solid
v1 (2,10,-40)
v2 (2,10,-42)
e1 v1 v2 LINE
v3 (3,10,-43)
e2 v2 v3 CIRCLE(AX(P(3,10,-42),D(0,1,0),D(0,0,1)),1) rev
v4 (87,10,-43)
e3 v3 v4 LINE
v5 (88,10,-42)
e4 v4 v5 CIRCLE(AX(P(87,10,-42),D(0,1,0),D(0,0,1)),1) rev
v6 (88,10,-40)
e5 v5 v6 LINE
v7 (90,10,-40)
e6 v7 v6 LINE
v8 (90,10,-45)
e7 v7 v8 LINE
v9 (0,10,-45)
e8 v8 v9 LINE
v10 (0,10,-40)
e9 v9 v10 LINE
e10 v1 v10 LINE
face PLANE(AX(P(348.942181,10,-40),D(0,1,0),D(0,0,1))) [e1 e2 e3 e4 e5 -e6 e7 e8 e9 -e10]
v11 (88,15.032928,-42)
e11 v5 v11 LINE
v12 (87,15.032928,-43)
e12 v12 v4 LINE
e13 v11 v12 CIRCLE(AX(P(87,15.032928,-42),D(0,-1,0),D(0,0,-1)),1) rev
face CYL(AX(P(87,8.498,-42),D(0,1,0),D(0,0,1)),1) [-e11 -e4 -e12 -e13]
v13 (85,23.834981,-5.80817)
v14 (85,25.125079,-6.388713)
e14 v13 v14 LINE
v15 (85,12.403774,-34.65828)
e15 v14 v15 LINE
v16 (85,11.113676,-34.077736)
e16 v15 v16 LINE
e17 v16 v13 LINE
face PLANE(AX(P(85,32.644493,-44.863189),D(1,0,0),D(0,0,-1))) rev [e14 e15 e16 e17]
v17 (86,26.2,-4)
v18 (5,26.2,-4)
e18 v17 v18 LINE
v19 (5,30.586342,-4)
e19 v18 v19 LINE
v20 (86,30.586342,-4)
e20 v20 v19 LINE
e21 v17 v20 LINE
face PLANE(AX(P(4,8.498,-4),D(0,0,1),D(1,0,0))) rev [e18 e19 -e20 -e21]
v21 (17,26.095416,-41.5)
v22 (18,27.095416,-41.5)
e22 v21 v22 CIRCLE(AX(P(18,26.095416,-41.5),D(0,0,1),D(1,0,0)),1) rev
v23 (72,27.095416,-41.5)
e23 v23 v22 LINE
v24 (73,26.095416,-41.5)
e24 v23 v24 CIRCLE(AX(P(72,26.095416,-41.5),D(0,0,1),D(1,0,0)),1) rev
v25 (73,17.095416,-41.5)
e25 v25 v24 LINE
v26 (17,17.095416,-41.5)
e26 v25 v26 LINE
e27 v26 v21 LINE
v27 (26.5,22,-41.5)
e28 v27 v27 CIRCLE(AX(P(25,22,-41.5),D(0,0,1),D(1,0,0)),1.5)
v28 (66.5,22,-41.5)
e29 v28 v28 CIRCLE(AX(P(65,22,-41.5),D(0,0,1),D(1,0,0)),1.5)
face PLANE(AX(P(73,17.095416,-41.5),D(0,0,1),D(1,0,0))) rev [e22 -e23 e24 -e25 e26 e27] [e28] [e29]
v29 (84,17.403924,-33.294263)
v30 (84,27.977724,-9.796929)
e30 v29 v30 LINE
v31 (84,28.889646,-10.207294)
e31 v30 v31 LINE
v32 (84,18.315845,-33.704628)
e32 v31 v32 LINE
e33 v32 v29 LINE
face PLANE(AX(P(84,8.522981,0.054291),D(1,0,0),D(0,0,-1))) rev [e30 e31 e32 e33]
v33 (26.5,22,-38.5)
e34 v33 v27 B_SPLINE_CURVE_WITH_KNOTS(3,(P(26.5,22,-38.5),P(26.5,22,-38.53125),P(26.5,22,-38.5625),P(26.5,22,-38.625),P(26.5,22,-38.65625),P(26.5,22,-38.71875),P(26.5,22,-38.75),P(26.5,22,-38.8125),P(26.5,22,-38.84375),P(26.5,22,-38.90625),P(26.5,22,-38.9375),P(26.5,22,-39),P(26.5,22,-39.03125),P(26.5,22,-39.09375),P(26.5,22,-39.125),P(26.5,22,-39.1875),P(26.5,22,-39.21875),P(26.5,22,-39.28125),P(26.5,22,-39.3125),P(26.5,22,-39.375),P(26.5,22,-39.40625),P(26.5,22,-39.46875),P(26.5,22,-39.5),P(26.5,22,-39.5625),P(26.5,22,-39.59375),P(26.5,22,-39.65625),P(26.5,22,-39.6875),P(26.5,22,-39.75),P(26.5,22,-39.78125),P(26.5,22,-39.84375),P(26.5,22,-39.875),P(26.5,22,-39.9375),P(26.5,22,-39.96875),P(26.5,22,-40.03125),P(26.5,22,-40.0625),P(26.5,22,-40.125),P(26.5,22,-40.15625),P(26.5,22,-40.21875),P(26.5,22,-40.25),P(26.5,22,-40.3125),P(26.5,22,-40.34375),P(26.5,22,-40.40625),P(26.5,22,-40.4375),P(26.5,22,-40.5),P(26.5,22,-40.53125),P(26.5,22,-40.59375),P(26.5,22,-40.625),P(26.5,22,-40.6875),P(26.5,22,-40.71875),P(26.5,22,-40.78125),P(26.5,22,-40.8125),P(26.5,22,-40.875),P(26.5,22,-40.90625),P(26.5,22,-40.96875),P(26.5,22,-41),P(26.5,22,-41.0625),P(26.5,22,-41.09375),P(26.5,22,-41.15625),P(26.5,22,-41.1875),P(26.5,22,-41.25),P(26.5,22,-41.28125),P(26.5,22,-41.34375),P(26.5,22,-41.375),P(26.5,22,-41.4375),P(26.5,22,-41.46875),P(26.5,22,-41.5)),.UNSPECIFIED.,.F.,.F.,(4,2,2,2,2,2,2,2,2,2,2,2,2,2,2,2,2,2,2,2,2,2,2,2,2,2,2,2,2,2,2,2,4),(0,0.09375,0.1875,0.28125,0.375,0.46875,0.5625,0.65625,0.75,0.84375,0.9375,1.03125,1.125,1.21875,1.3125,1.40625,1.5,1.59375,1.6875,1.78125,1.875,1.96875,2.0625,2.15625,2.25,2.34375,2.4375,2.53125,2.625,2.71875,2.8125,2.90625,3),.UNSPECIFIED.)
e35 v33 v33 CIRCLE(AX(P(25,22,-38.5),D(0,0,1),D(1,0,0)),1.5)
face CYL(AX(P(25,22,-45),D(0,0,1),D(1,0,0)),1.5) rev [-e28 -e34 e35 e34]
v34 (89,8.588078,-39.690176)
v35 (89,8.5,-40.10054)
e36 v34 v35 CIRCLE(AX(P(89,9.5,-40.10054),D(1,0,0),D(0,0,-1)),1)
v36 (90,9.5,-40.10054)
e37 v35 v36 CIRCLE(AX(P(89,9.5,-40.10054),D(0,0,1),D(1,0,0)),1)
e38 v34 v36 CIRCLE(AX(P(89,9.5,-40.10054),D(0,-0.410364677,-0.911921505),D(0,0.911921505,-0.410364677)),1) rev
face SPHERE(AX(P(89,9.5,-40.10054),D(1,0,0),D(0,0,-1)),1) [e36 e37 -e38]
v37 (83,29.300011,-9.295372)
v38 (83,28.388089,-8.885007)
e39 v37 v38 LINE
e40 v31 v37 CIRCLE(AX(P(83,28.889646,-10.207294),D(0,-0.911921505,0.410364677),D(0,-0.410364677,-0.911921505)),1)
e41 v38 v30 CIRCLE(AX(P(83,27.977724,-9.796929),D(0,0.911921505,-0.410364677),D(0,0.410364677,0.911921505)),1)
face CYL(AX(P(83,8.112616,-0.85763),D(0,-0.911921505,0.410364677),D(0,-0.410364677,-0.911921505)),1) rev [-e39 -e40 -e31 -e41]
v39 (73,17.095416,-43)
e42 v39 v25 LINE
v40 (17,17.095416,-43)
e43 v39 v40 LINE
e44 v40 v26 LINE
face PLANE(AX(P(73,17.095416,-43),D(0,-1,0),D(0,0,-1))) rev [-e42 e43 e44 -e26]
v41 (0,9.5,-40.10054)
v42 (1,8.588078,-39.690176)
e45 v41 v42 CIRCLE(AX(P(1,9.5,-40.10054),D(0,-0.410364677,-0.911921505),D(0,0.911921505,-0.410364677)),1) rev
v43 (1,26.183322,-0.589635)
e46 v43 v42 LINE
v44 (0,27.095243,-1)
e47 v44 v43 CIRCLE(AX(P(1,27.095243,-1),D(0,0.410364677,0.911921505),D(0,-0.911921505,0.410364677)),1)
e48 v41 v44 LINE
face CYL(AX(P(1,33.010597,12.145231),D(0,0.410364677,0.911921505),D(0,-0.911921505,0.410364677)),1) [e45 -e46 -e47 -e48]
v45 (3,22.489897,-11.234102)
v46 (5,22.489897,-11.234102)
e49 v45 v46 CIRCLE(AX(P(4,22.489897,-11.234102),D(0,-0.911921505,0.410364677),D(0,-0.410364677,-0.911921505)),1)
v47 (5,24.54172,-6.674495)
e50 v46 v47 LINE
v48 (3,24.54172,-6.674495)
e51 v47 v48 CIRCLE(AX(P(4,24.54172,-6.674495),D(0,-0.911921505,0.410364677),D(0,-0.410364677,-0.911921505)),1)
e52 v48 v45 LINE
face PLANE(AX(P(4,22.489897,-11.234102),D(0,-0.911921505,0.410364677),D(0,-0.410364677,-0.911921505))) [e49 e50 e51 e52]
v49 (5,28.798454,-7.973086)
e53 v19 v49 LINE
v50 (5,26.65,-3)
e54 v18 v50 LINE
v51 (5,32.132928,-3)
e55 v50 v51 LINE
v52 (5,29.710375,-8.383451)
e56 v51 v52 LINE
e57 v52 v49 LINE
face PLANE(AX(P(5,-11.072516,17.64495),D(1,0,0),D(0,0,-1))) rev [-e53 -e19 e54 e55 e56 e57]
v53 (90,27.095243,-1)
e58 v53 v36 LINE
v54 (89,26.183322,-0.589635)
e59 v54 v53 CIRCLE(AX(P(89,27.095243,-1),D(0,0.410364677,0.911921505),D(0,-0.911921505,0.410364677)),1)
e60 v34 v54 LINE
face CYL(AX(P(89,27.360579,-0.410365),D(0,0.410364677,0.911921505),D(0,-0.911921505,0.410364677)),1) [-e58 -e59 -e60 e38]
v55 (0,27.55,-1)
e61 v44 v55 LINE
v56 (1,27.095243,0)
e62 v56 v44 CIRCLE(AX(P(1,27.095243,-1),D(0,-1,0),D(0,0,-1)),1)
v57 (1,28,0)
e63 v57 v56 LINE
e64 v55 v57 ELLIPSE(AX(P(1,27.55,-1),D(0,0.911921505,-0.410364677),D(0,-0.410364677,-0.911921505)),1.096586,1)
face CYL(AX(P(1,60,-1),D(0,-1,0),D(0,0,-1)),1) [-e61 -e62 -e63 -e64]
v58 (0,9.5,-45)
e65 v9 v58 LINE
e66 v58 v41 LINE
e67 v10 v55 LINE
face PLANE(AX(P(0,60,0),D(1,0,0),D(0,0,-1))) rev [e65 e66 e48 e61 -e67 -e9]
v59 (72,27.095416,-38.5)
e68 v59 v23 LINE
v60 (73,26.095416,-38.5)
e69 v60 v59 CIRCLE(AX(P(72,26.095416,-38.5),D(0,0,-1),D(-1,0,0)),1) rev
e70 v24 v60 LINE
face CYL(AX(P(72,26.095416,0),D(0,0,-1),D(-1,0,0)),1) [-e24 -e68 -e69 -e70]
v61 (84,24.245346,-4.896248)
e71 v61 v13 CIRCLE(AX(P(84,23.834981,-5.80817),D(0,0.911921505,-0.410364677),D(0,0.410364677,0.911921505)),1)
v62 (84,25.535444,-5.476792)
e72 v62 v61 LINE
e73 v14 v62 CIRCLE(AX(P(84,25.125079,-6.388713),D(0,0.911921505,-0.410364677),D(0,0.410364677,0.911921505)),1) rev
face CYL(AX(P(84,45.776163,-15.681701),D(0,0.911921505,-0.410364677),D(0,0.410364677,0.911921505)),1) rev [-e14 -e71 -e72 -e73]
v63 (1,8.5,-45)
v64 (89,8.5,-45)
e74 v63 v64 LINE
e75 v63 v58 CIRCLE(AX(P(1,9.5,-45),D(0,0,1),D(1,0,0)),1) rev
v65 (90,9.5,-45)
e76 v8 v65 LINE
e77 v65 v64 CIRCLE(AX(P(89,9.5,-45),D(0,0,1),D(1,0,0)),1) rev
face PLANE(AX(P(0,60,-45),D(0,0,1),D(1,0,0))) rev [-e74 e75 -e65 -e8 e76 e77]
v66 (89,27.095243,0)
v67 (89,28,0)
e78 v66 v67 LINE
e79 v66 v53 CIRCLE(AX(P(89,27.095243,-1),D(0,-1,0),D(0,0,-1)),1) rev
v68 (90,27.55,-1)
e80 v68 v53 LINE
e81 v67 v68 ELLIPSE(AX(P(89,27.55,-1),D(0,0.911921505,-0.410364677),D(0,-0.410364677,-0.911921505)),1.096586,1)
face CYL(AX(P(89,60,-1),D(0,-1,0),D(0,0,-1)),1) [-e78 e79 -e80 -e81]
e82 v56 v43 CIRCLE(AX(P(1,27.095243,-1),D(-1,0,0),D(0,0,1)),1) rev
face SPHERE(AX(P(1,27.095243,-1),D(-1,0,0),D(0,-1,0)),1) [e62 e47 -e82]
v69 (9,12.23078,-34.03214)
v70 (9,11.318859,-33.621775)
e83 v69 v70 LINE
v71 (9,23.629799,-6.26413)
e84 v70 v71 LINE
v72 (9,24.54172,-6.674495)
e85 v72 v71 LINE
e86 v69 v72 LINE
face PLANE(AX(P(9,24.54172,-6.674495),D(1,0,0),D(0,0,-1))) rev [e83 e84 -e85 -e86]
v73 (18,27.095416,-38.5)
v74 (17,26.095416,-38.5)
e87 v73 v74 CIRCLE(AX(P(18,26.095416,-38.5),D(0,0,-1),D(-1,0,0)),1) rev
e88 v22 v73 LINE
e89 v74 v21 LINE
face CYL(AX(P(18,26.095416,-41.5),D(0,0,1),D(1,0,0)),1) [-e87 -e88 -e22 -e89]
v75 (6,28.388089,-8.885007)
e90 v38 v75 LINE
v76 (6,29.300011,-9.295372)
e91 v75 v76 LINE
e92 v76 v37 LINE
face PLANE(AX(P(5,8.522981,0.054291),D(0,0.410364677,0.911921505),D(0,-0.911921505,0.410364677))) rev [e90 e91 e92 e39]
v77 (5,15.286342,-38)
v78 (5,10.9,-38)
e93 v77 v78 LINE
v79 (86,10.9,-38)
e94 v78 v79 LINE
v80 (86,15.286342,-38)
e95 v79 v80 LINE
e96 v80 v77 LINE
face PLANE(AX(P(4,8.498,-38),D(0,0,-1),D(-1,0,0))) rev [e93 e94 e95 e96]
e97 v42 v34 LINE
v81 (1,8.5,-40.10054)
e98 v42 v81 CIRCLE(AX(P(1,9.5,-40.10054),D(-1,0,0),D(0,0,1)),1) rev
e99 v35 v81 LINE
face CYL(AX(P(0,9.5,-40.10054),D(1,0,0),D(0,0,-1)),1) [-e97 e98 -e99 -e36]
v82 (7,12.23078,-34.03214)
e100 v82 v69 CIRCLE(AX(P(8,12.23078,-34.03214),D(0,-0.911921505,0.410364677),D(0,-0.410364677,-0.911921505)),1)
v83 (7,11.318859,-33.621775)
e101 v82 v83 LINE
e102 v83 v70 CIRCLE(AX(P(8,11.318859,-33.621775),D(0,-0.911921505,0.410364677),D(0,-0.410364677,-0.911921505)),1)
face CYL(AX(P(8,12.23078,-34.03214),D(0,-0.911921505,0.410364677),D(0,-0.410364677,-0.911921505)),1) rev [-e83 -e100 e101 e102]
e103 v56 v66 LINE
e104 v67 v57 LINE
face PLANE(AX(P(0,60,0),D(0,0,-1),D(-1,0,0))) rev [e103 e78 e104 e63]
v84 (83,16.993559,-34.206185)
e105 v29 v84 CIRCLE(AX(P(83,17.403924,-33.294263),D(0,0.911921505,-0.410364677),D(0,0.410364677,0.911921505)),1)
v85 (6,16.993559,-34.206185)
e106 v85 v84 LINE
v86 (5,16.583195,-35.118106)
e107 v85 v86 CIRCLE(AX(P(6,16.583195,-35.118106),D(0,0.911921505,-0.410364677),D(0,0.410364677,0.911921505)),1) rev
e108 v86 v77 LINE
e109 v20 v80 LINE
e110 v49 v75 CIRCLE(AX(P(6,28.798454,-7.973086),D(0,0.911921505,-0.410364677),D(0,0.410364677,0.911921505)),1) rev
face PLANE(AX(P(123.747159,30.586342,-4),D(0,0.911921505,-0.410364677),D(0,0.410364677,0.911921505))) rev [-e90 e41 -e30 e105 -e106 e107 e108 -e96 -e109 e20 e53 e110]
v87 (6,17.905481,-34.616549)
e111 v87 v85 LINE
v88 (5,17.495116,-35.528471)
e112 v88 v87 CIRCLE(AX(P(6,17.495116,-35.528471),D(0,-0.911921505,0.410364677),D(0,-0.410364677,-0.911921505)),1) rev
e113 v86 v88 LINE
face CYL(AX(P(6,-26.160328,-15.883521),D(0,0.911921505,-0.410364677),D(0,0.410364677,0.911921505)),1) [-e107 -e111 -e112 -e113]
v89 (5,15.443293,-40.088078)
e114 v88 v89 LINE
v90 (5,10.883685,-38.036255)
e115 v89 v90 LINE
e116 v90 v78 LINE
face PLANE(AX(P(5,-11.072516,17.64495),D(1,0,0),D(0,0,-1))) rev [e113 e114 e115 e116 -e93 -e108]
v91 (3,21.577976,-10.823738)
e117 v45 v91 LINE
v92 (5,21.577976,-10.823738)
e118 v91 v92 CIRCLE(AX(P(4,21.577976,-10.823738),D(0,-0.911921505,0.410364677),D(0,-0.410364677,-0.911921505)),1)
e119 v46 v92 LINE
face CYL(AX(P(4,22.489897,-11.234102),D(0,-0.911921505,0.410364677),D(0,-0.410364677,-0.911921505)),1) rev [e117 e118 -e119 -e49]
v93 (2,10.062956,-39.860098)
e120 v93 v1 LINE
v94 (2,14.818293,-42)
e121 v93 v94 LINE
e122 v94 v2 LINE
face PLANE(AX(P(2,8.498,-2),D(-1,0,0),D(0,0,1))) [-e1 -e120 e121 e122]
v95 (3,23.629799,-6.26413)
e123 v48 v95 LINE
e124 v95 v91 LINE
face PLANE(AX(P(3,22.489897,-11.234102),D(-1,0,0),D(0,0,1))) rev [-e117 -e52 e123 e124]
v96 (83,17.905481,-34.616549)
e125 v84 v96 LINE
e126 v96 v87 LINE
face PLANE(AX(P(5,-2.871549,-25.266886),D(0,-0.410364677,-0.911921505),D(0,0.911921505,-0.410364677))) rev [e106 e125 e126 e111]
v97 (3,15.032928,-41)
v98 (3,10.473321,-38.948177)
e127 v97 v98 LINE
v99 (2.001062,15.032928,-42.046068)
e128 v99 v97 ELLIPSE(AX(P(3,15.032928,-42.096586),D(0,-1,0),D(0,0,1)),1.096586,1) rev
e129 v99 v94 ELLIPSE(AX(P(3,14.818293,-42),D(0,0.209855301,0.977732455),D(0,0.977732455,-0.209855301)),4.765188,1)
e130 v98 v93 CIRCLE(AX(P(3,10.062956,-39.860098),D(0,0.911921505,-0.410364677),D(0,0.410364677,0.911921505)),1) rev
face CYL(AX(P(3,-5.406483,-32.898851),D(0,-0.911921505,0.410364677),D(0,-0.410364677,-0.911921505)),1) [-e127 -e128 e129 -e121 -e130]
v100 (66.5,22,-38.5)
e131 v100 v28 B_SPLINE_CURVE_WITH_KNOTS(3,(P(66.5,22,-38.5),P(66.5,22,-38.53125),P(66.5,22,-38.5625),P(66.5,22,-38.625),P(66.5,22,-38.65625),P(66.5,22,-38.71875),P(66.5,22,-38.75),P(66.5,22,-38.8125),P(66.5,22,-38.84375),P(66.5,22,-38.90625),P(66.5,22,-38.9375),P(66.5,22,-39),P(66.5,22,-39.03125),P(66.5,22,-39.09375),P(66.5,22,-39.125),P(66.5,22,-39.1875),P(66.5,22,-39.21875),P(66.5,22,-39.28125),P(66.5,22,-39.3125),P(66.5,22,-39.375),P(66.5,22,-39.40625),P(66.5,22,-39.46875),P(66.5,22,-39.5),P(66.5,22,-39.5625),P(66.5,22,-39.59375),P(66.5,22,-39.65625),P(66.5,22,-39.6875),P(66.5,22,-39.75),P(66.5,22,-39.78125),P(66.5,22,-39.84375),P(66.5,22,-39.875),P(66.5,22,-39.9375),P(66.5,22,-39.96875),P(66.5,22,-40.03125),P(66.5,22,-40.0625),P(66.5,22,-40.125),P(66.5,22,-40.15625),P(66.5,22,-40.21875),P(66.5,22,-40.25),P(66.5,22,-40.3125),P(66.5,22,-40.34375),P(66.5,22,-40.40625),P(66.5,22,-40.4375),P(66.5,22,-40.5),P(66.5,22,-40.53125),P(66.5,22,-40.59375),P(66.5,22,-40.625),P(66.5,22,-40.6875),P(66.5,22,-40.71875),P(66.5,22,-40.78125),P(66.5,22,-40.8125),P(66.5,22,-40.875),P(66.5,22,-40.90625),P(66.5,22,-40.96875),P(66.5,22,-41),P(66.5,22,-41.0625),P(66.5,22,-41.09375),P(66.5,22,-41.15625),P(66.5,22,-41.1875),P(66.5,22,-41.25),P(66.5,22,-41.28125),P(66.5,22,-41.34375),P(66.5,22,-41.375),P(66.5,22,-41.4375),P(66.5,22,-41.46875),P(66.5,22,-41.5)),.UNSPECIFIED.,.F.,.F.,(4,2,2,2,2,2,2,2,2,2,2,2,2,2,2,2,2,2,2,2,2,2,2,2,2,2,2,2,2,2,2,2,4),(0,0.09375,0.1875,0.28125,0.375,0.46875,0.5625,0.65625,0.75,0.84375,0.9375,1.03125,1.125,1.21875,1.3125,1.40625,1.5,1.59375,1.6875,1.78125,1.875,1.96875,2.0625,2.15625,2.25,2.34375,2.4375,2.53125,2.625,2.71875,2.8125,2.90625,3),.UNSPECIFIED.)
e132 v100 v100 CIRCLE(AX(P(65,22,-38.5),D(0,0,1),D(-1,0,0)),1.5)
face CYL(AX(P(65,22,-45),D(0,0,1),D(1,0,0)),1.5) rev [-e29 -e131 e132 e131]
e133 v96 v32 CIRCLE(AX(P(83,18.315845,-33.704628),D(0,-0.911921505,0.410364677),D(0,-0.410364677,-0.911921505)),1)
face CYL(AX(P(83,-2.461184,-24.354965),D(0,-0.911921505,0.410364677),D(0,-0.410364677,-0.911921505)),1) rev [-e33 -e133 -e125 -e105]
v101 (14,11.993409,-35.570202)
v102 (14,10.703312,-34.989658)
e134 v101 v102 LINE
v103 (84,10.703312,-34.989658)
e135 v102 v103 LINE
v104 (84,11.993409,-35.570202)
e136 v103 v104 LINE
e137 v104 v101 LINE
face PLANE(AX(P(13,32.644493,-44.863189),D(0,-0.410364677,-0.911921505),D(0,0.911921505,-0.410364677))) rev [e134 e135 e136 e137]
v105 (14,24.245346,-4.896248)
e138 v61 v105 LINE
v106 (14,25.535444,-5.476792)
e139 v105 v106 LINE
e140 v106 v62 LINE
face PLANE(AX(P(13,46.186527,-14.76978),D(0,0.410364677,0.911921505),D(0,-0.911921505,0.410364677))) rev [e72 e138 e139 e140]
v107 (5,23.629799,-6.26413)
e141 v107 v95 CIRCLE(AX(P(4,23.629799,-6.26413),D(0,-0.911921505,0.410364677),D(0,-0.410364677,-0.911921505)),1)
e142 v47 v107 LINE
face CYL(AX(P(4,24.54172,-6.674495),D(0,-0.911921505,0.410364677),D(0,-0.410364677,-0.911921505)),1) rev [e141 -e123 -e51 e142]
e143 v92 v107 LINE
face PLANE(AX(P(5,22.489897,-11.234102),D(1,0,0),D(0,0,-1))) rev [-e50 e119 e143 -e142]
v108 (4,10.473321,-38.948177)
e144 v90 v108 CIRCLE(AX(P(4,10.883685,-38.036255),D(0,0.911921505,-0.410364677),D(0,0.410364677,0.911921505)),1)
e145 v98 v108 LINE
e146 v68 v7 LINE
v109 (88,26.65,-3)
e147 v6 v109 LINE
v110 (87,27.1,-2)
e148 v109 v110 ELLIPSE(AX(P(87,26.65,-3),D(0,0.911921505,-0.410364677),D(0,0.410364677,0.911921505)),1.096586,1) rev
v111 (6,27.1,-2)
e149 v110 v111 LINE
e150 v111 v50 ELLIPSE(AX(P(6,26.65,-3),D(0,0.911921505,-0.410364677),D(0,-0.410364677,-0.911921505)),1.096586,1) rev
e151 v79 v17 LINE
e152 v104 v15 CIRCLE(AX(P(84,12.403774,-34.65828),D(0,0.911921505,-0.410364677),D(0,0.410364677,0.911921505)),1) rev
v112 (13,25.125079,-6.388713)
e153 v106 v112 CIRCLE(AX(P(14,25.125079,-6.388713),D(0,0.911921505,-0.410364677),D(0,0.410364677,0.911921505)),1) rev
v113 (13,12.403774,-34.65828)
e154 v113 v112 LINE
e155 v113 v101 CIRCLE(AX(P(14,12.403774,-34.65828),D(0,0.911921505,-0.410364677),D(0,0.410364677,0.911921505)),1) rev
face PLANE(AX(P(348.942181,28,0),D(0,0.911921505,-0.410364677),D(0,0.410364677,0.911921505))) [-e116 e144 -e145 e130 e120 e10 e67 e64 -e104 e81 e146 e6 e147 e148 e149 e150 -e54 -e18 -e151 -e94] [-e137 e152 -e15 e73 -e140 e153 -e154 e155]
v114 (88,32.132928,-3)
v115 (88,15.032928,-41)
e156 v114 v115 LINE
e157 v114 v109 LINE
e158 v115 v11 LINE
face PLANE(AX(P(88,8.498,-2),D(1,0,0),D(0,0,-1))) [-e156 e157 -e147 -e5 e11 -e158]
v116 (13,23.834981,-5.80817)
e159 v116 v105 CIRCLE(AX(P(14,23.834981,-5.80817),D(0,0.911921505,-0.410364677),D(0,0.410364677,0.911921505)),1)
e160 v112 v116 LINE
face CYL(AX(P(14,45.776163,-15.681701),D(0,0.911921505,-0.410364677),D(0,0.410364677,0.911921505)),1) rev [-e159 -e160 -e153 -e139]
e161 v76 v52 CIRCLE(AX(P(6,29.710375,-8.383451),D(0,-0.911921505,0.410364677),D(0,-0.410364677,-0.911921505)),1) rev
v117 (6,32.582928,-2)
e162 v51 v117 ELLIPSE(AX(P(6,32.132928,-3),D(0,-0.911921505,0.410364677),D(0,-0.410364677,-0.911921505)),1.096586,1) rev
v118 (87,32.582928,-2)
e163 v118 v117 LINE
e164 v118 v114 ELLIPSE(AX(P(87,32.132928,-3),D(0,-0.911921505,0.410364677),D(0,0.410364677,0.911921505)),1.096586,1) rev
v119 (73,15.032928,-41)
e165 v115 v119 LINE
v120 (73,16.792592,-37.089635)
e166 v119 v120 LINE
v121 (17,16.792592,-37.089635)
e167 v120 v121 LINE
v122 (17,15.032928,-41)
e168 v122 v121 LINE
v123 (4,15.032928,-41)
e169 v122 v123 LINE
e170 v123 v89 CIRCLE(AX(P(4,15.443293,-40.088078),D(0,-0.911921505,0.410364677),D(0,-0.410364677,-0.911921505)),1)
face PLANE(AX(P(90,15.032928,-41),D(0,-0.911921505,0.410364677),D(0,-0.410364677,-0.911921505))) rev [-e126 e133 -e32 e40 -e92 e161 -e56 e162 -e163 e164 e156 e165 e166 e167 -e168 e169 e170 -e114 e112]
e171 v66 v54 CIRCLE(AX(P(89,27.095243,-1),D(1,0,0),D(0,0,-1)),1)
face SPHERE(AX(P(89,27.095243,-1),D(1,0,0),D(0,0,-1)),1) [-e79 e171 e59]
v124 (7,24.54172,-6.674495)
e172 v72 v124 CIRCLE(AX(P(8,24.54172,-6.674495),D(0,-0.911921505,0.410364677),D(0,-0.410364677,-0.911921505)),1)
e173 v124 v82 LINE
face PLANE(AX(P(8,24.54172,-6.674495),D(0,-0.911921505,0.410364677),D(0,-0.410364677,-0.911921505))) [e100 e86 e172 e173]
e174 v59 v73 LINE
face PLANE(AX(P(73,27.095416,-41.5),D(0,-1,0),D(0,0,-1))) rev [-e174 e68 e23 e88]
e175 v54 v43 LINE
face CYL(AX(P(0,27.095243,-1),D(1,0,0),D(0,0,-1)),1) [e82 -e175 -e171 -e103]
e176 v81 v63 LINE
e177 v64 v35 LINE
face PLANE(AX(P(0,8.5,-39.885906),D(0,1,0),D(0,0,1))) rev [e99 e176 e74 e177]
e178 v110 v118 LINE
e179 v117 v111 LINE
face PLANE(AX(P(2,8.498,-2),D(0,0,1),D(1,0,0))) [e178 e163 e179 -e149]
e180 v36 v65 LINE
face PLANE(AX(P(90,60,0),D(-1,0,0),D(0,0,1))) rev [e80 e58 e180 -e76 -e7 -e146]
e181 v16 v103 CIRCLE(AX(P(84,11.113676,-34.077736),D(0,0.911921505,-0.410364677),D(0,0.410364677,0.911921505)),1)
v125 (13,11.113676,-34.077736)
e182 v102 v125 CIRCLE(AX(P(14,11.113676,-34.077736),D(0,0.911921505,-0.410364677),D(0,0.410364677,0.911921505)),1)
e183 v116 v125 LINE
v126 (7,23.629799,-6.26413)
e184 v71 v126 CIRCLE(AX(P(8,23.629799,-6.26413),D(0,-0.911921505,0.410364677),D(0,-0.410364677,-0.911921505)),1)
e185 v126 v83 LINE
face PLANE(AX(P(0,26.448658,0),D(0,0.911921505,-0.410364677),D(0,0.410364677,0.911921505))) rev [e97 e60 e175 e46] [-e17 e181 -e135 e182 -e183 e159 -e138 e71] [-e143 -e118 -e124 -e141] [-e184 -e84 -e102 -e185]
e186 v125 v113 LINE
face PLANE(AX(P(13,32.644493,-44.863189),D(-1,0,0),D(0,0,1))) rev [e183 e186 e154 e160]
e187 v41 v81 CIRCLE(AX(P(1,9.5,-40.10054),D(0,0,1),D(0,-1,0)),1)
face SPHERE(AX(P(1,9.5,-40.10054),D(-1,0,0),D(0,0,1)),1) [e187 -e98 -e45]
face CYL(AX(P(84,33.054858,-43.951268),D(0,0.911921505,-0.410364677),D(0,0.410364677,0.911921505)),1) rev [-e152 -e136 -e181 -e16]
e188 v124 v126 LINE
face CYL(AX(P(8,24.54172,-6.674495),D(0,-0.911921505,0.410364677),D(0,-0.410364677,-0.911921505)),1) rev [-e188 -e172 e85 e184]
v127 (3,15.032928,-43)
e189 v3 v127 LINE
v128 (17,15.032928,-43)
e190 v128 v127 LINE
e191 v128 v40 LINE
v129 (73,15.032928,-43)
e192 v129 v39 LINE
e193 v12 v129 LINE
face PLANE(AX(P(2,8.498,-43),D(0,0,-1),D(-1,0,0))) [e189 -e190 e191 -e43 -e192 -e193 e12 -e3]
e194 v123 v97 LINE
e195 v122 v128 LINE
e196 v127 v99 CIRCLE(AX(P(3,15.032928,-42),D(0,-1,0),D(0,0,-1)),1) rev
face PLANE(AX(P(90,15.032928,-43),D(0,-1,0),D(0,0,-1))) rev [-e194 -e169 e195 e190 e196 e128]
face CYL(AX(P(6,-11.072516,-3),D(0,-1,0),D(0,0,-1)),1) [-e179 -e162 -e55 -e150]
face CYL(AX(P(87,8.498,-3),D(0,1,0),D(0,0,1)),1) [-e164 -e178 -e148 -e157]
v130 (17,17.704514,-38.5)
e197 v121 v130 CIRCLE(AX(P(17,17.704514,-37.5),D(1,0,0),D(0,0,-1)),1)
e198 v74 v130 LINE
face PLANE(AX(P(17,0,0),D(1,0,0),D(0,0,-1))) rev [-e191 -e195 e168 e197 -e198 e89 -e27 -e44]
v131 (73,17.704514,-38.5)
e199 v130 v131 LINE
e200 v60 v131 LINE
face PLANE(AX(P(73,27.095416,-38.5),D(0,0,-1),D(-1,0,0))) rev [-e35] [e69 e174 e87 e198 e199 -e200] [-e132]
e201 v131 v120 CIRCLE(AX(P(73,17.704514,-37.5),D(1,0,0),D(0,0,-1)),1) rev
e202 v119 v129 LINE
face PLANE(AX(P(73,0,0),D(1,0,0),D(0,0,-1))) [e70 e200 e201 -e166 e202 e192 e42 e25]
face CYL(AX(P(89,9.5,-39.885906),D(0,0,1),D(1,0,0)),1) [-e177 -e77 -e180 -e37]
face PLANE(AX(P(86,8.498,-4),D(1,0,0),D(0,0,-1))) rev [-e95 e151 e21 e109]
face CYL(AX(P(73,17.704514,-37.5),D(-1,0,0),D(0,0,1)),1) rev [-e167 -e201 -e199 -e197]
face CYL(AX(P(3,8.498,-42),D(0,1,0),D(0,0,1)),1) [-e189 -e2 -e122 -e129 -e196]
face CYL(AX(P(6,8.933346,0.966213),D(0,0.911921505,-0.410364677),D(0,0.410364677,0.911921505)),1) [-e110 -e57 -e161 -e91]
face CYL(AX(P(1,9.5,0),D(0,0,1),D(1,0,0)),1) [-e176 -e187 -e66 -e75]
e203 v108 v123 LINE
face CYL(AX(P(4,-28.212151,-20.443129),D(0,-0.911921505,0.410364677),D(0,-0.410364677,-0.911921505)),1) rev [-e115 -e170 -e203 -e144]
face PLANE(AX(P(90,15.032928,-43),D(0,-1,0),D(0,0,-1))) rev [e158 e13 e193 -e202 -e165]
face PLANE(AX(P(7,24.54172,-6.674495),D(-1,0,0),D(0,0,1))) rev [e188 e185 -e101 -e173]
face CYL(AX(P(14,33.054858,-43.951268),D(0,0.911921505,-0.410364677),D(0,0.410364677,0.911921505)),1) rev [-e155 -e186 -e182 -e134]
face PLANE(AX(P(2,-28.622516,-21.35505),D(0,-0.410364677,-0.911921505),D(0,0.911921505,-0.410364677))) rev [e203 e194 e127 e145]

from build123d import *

# Parameters (mm, degrees)
SKETCH_1_W               = 90
SKETCH_1_H               = 45
EXTRUDE_1_DEPTH          = 60
CUT_EXTRUDE_1_DEPTH      = 118.153745139
CUT_EXTRUDE_1_DEPTH_BACK = 118.153745139
CUT_EXTRUDE_2_DEPTH      = 105.446158378
EXTRUDE_3_REACH          = 105.804
SKETCH_4_W               = 86
SKETCH_4_H               = 41
SKETCH_4_W_2             = 82
SKETCH_4_H_2             = 34
CUT_EXTRUDE_3_DEPTH      = 105.522724802
SKETCH_6_W               = 72
SKETCH_6_H               = 33
CUT_EXTRUDE_4_DEPTH      = 98.541192544
EXTRUDE_8_DEPTH          = 82
CUT_EXTRUDE_5_REACH      = 99.614
SKETCH_10_W              = 79
SKETCH_10_H              = 27.766838789
SKETCH_11_W              = 3
SKETCH_11_H              = 42.766838789
CUT_EXTRUDE_6_DEPTH      = 5
EXTRUDE_9_DEPTH          = 28
SKETCH_13_R              = 1.5
CUT_EXTRUDE_7_DEPTH      = 104.169264805
FILLET_1_R               = 1
FILLET_2_R               = 1
FILLET_3_R               = 1
CUT_EXTRUDE_8_DEPTH      = 1


with BuildPart() as part:
    # 草图1 → 凸台-拉伸1 (new body)
    with BuildSketch(Plane(origin=(0, 0, 0), x_dir=(1, 0, 0), z_dir=(0, 1, 0))):
        with Locations((45, 22.5)):
            Rectangle(SKETCH_1_W, SKETCH_1_H)
    extrude(amount=EXTRUDE_1_DEPTH)

    # 草图2 → 切除-拉伸1 (cut, two sides: drawn at the far end of the back side and taken through both)
    with BuildSketch(Plane(origin=(90, 0, 0), x_dir=(0, 0, -1), z_dir=(1, 0, 0)).offset(-CUT_EXTRUDE_1_DEPTH_BACK)):
        Polygon((0, 220), (0, 60), (0, 28), (40, 10), (45, 10), (205, 10), (433.983745882, 233.531751932), (228.983745882, 443.531751932), align=None)
    extrude(amount=CUT_EXTRUDE_1_DEPTH + CUT_EXTRUDE_1_DEPTH_BACK, mode=Mode.SUBTRACT)

    # 草图3 → 切除-拉伸2 (cut, through all)
    with BuildSketch(Plane(origin=(90, 0, 0), x_dir=(0, 0, -1), z_dir=(1, 0, 0))):
        Polygon((0, 26.44865757), (39.885905712, 8.5), (45, 8.5), (45, 0), (0, 0), align=None)
    extrude(amount=-CUT_EXTRUDE_2_DEPTH, mode=Mode.SUBTRACT)

    # 草图4 → 凸台-拉伸3 (add, up to next)
    with BuildSketch(Plane(origin=(0, 34, 0), x_dir=(1, 0, 0), z_dir=(0, 1, 0)), mode=Mode.PRIVATE) as extrude_3_sk1:
        with Locations((45, 22.5)):
            Rectangle(SKETCH_4_W, SKETCH_4_H)
        with Locations((45, 21)):
            Rectangle(SKETCH_4_W_2, SKETCH_4_H_2, mode=Mode.SUBTRACT)
    extrude_3_tool1 = extrude(extrude_3_sk1.sketch, amount=-EXTRUDE_3_REACH, mode=Mode.PRIVATE) - part.part
    add(extrude_3_tool1.solids().sort_by_distance((45, 34, -2.952733))[0])

    # 草图5 → 切除-拉伸3 (cut, through all)
    with BuildSketch(Plane.ZY.offset(-2)):
        Polygon((-43, 15.03292805), (-41, 15.03292805), (-2, 32.58292805), (-2, 34), (-43, 34), align=None)
    extrude(amount=-CUT_EXTRUDE_3_DEPTH, mode=Mode.SUBTRACT)

    # 草图6 → 切除-拉伸4 (cut, through all)
    with BuildSketch(Plane(origin=(0, 21.99472563, -9.897626534), x_dir=(1, 0, 0), z_dir=(0, -0.9119215051751064, 0.41036467732879806))):
        with Locations((49, -11.015560293)):
            Rectangle(SKETCH_6_W, SKETCH_6_H)
    extrude(amount=-CUT_EXTRUDE_4_DEPTH, mode=Mode.SUBTRACT)

    # 草图9 → 凸台-拉伸8 (add)
    with BuildSketch(Plane(origin=(4, 0, 0), x_dir=(0, 0, -1), z_dir=(1, 0, 0))):
        Polygon((4, 31.68292805), (4, 30.58634244), (38, 15.28634244), (38, 16.38292805), align=None)
    extrude(amount=EXTRUDE_8_DEPTH)

    # 草图10 → 切除-拉伸5 (cut, up to next)
    with BuildSketch(Plane(origin=(0, 27.844430811, -12.529993865), x_dir=(1, 0, 0), z_dir=(0, 0.9119215051751064, -0.410364677328798)), mode=Mode.PRIVATE) as cut_extrude_5_sk1:
        with Locations((44.5, 10.33637965)):
            Rectangle(SKETCH_10_W, SKETCH_10_H)
    cut_extrude_5_tool1 = extrude(cut_extrude_5_sk1.sketch, amount=-CUT_EXTRUDE_5_REACH, mode=Mode.PRIVATE) & part.part
    add(cut_extrude_5_tool1.solids().sort_by_distance((44.5, 23.602746, -21.955961))[0], mode=Mode.SUBTRACT)

    # 草图11 → 切除-拉伸6 (cut)
    with BuildSketch(Plane(origin=(0, 27.844430811, -12.529993865), x_dir=(1, 0, 0), z_dir=(0, 0.9119215051751064, -0.410364677328798))):
        with Locations((3.5, 9.836379649)):
            Rectangle(SKETCH_11_W, SKETCH_11_H)
    extrude(amount=-CUT_EXTRUDE_6_DEPTH, mode=Mode.SUBTRACT)

    # 草图12 → 凸台-拉伸9 (add, symmetric)
    with BuildSketch(Plane(origin=(45, 0, 0), x_dir=(0, 0, -1), z_dir=(1, 0, 0))):
        Polygon((43, 15.03292805), (43, 17.095415955), (41.5, 17.095415955), (41.5, 27.095415955), (38.5, 27.095415955), (38.5, 15.06134244), (41, 15.03292805), align=None)
    extrude(amount=EXTRUDE_9_DEPTH, both=True)

    # 草图13 → 切除-拉伸7 (cut, through all)
    with BuildSketch(Plane.XY.offset(-38.5)):
        with Locations((25, 22)):
            Circle(SKETCH_13_R)
        with Locations((65, 22)):
            Circle(SKETCH_13_R)
    extrude(amount=-CUT_EXTRUDE_7_DEPTH, mode=Mode.SUBTRACT)

    # 圆角1
    fillet_1_edges = [part.edges().sort_by_distance(p)[0] for p in [
        (13, 11.348360437, -35.279929664),
        (13, 24.890394788, -5.186519993),
        (85, 24.890394788, -5.186519993),
        (85, 11.348360437, -35.279929664),
        (90, 27.224328785, 0),
        (0, 27.224328785, 0),
        (0, 17.474328785, -19.942952856),
        (45, 26.44865757, 0),
        (0, 8.5, -42.442952856),
        (45, 8.5, -39.885905712),
        (90, 8.5, -42.442952856),
        (90, 17.474328785, -19.942952856),
    ]]
    fillet(fillet_1_edges, radius=FILLET_1_R)

    # 圆角2
    fillet_2_edges = [part.edges().sort_by_distance(p)[0] for p in [
        (45, 16.15792805, -38.5),
        (73, 27.095415955, -40),
        (17, 27.095415955, -40),
    ]]
    fillet(fillet_2_edges, radius=FILLET_2_R)

    # 圆角3
    # the kernel refuses this fillet: 1 mm, written as the material it adds along each edge
    with BuildSketch(Plane(origin=(84, 29.300010631, -9.295372041), x_dir=(0, -0.4103646773287979, -0.9119215051751064), z_dir=(0, -0.9119215051751064, 0.41036467732879794)), Plane(origin=(84, 17.905480791, -34.616549464), x_dir=(-1, 0, 0), z_dir=(0, -0.9119215051751064, 0.41036467732879794))) as fillet_3_piece_1:
        with BuildLine():
            CenterArc((FILLET_3_R, -FILLET_3_R), FILLET_3_R, 90, 90)
            Line((0, -FILLET_3_R), (0, 0))
            Line((0, 0), (FILLET_3_R, 0))
        make_face()
    extrude(amount=1)
    with BuildSketch(Plane(origin=(5, 15.03292805, -41), x_dir=(-1, 0, 0), z_dir=(0, -0.9119215051751064, 0.410364677328798))) as fillet_3_piece_2_section:
        with BuildLine():
            CenterArc((FILLET_3_R, -FILLET_3_R), FILLET_3_R, 90, 90)
            Line((0, -FILLET_3_R), (0, 0))
            Line((0, 0), (FILLET_3_R, 0))
        make_face()
    fillet_3_piece_2 = extrude(amount=7.5, mode=Mode.PRIVATE)
    fillet_3_piece_2 = split(fillet_3_piece_2, bisect_by=Plane(origin=(4.869229562, 9.339477608, -38.020399916), z_dir=(0, 0.9119215051751064, -0.41036467732879794)), keep=Keep.TOP, mode=Mode.PRIVATE)
    add(fillet_3_piece_2)
    # the kernel refuses this fillet: 1 mm, written as the material it takes off along each edge
    with BuildSketch(Plane(origin=(88, 17.53292805, -43), x_dir=(-1, 0, 0), z_dir=(0, -1, 0))) as fillet_3_2_piece_1:
        with BuildLine():
            CenterArc((FILLET_3_R, -FILLET_3_R), FILLET_3_R, 90, 90)
            Line((0, -FILLET_3_R), (0, 0))
            Line((0, 0), (FILLET_3_R, 0))
        make_face()
    extrude(amount=7.53292805, mode=Mode.SUBTRACT)
    with BuildSketch(Plane(origin=(2, 17.53292805, -43), x_dir=(1, 0, 0), z_dir=(0, -1, 0))) as fillet_3_2_piece_2:
        with BuildLine():
            CenterArc((FILLET_3_R, FILLET_3_R), FILLET_3_R, 180, 90)
            Line((0, FILLET_3_R), (0, 0))
            Line((0, 0), (FILLET_3_R, 0))
        make_face()
    extrude(amount=7.53292805, mode=Mode.SUBTRACT)
    with BuildSketch(Plane(origin=(5, 31.579814394, -10.321283735), x_dir=(1, 0, 0), z_dir=(0, -0.9119215051751064, 0.41036467732879794)), Plane(origin=(5, 20.185284554, -35.642461157), x_dir=(0, -0.4103646773287979, -0.9119215051751064), z_dir=(0, -0.9119215051751064, 0.41036467732879794))) as fillet_3_2_piece_3:
        with BuildLine():
            CenterArc((FILLET_3_R, FILLET_3_R), FILLET_3_R, 180, 90)
            Line((0, FILLET_3_R), (0, 0))
            Line((0, 0), (FILLET_3_R, 0))
        make_face()
    extrude(amount=6, mode=Mode.SUBTRACT)
    with BuildSketch(Plane(origin=(2, 17.312731813, -42.025911693), x_dir=(0, -0.410364677328798, -0.9119215051751063), z_dir=(0, -0.9119215051751064, 0.410364677328798))) as fillet_3_2_piece_4:
        with BuildLine():
            CenterArc((FILLET_3_R, FILLET_3_R), FILLET_3_R, 180, 90)
            Line((0, FILLET_3_R), (0, 0))
            Line((0, 0), (FILLET_3_R, 0))
        make_face()
    extrude(amount=7.5, mode=Mode.SUBTRACT)
    with BuildSketch(Plane(origin=(5, 35.08292805, -2), x_dir=(0, 0, -1), z_dir=(0, -1, 0))) as fillet_3_2_piece_5_section:
        with BuildLine():
            CenterArc((FILLET_3_R, FILLET_3_R), FILLET_3_R, 180, 90)
            Line((0, FILLET_3_R), (0, 0))
            Line((0, 0), (FILLET_3_R, 0))
        make_face()
    fillet_3_2_piece_5 = extrude(amount=10.48292805, mode=Mode.PRIVATE)
    fillet_3_2_piece_5 = split(fillet_3_2_piece_5, bisect_by=Plane(origin=(5.223367939, 27.46114469, -1.197456246), z_dir=(0, 0.9119215051751064, -0.4103646773287979)), keep=Keep.TOP, mode=Mode.PRIVATE)
    add(fillet_3_2_piece_5, mode=Mode.SUBTRACT)
    with BuildSketch(Plane(origin=(88, 35.08292805, -2), x_dir=(-1, 0, 0), z_dir=(0, -1, 0))) as fillet_3_2_piece_6_section:
        with BuildLine():
            CenterArc((FILLET_3_R, FILLET_3_R), FILLET_3_R, 180, 90)
            Line((0, FILLET_3_R), (0, 0))
            Line((0, 0), (FILLET_3_R, 0))
        make_face()
    fillet_3_2_piece_6 = extrude(amount=10.48292805, mode=Mode.PRIVATE)
    fillet_3_2_piece_6 = split(fillet_3_2_piece_6, bisect_by=Plane(origin=(87.776632061, 27.46114469, -1.197456246), z_dir=(0, 0.9119215051751064, -0.4103646773287979)), keep=Keep.TOP, mode=Mode.PRIVATE)
    add(fillet_3_2_piece_6, mode=Mode.SUBTRACT)

    # 草图14 → 切除-拉伸8 (cut)
    with BuildSketch(Plane(origin=(0, 21.99472563, -9.897626534), x_dir=(1, 0, 0), z_dir=(0, -0.9119215051751063, 0.4103646773287981))):
        with BuildLine():
            Line((9, 3.984439707), (9, -26.015560293))
            ThreePointArc((9, -26.015560293), (8, -27.015560293), (7, -26.015560293))
            Line((7, -26.015560293), (7, 3.984439707))
            ThreePointArc((7, 3.984439707), (8, 4.984439707), (9, 3.984439707))
        make_face()
        with BuildLine():
            Line((3, -1.015560293), (3, 3.984439707))
            ThreePointArc((3, 3.984439707), (4, 4.984439707), (5, 3.984439707))
            Line((5, 3.984439707), (5, -1.015560293))
            ThreePointArc((5, -1.015560293), (4, -2.015560293), (3, -1.015560293))
        make_face()
    extrude(amount=-CUT_EXTRUDE_8_DEPTH, mode=Mode.SUBTRACT)


solid = part.part
